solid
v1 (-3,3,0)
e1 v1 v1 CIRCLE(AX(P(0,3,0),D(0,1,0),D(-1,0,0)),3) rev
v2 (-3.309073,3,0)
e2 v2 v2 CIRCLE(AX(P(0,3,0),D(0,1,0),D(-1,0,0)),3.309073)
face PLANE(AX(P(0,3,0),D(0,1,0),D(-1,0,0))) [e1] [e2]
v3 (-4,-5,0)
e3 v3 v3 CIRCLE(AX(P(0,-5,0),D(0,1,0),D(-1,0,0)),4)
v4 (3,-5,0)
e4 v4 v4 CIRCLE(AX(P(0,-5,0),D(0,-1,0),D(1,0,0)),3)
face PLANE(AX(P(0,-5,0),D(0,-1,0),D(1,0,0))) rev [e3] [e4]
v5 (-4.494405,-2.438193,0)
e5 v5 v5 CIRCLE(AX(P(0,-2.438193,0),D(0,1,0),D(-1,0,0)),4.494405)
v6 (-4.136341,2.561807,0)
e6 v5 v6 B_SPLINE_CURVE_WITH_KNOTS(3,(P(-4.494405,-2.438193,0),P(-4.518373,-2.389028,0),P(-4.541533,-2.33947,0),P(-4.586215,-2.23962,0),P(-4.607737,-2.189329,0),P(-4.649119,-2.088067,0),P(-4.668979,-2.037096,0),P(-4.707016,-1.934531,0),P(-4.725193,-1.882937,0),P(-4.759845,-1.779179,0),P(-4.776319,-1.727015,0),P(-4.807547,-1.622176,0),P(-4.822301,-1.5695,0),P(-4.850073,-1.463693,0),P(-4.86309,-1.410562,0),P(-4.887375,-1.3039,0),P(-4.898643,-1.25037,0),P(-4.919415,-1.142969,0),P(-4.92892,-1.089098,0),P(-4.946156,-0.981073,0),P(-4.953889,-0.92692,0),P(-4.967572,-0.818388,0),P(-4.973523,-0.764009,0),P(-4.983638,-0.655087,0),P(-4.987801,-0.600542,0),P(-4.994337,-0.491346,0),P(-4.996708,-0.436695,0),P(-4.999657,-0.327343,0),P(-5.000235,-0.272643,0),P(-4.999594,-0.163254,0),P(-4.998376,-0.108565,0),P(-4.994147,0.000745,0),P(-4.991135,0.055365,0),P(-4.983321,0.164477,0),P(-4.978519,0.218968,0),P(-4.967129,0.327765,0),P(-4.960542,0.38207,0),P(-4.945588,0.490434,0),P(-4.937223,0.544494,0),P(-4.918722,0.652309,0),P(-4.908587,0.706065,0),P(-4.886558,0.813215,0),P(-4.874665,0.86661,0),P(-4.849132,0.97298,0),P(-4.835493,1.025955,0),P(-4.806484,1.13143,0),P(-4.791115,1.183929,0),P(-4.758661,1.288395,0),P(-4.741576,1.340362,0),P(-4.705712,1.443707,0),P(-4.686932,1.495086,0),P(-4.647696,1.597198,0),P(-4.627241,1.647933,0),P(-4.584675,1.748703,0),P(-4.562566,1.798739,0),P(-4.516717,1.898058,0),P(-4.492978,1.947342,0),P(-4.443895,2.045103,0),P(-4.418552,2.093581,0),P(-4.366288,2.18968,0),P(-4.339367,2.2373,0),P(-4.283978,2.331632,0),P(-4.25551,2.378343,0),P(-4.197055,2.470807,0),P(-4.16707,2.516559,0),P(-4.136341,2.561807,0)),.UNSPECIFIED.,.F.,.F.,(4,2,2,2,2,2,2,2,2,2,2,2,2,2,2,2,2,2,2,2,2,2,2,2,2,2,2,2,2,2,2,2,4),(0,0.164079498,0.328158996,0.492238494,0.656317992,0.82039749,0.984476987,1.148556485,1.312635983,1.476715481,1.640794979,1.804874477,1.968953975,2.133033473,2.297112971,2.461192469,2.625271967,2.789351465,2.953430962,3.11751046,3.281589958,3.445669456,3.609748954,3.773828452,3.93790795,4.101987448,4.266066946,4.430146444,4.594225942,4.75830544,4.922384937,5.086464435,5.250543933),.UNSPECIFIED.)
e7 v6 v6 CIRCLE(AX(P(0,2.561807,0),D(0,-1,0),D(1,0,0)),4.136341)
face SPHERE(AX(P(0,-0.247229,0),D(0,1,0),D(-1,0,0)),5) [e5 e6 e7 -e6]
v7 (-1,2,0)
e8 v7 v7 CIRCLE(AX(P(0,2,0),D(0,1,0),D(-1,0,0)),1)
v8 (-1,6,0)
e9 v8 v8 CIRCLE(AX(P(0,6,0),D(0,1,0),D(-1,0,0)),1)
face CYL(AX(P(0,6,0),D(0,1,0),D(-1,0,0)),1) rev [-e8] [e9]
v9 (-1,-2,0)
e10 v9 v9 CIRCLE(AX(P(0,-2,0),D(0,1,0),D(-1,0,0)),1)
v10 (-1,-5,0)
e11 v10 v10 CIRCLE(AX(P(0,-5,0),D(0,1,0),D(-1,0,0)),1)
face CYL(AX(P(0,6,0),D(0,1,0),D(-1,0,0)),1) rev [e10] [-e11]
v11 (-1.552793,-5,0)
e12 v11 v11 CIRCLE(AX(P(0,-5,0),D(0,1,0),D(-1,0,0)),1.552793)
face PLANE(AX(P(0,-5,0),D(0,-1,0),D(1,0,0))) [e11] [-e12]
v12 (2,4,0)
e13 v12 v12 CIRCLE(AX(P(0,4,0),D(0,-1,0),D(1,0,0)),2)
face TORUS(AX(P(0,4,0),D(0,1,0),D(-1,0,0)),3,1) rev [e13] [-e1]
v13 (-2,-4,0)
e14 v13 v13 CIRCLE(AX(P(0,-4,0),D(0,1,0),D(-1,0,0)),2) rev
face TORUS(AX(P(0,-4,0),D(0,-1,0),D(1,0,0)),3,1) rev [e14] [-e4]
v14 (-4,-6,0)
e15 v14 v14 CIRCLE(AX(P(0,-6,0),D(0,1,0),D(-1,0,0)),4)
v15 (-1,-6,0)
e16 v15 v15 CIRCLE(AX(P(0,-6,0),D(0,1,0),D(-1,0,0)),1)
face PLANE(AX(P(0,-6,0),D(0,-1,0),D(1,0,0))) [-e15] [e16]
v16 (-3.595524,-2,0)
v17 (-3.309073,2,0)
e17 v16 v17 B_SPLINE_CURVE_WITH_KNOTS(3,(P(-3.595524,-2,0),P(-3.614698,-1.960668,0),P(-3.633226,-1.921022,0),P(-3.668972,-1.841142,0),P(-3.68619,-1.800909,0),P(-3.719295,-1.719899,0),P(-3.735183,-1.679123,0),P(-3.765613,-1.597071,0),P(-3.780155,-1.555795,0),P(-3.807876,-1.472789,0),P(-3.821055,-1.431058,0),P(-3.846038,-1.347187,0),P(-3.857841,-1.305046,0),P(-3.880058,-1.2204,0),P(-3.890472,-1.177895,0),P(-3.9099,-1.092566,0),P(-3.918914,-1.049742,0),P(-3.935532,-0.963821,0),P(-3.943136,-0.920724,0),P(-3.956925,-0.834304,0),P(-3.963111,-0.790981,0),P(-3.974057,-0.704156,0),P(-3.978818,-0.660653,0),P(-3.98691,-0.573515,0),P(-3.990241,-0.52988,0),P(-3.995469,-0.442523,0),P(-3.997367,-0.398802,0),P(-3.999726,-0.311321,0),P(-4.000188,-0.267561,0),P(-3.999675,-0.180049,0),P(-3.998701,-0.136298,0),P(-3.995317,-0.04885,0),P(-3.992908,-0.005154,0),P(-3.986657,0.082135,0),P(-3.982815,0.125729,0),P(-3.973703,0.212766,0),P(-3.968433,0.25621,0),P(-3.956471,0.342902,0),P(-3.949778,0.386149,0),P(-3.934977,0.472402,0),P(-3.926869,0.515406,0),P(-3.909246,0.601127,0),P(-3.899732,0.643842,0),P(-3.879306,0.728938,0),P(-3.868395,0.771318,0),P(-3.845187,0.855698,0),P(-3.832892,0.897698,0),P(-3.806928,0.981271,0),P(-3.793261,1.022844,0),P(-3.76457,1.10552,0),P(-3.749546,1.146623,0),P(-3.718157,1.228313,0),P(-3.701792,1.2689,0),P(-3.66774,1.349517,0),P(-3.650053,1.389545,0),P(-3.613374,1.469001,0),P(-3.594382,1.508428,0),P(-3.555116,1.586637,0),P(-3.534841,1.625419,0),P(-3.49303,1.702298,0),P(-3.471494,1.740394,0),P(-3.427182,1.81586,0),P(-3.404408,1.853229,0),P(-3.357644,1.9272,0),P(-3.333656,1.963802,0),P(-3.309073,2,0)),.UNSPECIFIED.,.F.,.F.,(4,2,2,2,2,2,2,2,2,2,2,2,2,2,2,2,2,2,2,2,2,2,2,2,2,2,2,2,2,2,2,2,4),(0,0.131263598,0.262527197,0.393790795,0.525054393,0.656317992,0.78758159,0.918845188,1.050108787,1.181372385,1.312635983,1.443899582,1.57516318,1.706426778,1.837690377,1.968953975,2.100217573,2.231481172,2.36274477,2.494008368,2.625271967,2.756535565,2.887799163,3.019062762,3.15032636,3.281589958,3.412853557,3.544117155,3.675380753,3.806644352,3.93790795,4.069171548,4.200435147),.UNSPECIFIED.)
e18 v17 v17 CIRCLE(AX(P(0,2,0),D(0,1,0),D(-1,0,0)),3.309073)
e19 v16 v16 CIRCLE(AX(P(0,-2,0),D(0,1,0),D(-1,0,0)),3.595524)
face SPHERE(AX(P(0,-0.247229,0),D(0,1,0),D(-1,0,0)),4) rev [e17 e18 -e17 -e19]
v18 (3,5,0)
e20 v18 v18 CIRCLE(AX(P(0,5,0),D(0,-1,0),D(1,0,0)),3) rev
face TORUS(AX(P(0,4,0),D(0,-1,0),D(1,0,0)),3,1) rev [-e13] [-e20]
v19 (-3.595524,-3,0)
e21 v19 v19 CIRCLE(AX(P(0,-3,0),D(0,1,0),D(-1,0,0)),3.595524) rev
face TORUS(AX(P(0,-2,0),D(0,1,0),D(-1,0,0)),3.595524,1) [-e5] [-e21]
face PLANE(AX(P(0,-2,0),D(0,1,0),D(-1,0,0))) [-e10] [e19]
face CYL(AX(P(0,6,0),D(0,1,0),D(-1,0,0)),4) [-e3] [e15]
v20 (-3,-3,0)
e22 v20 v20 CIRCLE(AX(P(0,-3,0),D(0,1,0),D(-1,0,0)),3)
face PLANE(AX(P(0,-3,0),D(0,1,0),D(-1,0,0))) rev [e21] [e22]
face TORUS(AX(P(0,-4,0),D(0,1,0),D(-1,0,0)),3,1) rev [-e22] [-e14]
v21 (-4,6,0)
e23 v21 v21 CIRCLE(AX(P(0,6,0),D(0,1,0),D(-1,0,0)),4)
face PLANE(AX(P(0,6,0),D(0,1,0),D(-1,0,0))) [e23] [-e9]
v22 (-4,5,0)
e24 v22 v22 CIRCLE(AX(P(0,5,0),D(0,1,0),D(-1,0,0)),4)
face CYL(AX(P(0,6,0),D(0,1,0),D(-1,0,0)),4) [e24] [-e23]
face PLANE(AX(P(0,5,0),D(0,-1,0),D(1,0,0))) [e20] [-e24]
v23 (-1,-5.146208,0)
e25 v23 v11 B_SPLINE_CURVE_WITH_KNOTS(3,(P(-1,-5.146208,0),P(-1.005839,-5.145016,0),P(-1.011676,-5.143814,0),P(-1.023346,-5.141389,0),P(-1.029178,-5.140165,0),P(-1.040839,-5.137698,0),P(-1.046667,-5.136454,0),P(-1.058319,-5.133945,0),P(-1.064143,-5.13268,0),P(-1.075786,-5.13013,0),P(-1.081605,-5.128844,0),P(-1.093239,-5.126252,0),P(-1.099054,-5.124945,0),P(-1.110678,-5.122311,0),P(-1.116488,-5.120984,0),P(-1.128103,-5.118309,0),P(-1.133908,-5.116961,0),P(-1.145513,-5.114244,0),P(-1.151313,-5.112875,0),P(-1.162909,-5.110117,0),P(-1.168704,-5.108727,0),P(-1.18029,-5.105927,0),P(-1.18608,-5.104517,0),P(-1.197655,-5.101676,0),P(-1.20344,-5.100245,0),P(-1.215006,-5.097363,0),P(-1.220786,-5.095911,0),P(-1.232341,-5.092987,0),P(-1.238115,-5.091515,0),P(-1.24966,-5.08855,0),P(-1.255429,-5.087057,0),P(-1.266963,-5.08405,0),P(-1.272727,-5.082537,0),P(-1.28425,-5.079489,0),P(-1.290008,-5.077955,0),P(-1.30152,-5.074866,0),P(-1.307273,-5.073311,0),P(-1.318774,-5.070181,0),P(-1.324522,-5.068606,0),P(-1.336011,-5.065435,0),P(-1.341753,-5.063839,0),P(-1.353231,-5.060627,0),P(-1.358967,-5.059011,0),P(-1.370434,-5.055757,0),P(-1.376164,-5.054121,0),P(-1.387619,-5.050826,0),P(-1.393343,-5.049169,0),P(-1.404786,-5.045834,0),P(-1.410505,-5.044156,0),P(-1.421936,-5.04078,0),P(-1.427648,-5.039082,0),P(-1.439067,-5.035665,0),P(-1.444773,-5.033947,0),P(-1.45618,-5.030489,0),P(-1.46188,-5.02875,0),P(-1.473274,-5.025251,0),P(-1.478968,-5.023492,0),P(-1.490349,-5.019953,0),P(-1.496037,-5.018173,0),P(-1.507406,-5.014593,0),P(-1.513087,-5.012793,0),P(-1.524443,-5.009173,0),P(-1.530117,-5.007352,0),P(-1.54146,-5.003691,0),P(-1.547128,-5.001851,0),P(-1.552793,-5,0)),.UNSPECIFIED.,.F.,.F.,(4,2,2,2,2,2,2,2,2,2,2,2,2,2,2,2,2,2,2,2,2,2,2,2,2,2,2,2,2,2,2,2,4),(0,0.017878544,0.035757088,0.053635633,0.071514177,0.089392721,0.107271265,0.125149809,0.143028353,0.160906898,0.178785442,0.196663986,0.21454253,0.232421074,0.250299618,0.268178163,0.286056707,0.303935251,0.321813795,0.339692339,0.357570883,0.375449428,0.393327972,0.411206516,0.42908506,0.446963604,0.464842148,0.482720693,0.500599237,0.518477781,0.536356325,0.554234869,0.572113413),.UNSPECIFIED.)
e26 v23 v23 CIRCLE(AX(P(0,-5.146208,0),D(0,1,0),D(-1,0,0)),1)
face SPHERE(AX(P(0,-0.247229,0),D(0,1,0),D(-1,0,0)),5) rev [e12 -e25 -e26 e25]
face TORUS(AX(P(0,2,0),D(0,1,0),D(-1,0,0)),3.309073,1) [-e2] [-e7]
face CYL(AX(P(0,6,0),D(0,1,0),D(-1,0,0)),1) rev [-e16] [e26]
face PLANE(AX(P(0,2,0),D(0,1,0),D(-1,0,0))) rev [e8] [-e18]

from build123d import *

# Parameters (mm, degrees)
FILLET1_R = 1


with BuildPart() as part:
    # Sketch1 → Revolve1 (revolve)
    with BuildSketch(Plane.XY):
        with BuildLine():
            Line((-1, 6), (-4, 6))
            Line((-4, 6), (-4, 5))
            Line((-4, 5), (-2, 5))
            Line((-2, 5), (-2, 3))
            Line((-2, 3), (-3.802039542, 3))
            ThreePointArc((-3.802039542, 3), (-4.990419802, 0.06214179), (-4.173997016, -3))
            Line((-4.173997016, -3), (-2, -3))
            Line((-2, -3), (-2, -5))
            Line((-2, -5), (-4, -5))
            Line((-4, -5), (-4, -6))
            Line((-4, -6), (-1, -6))
            Line((-1, -6), (-1, -5.146208353))
            ThreePointArc((-1, -5.146208353), (-1.27848834, -5.081012847), (-1.552793148, -5))
            Line((-1.552793148, -5), (-1, -5))
            Line((-1, -5), (-1, -2))
            Line((-1, -2), (-3.595524073, -2))
            ThreePointArc((-3.595524073, -2), (-3.989782487, 0.038490757), (-3.309072743, 2))
            Line((-3.309072743, 2), (-1, 2))
            Line((-1, 2), (-1, 6))
        make_face()
    revolve(axis=Axis((0, 6, 0), (0, -1, 0)))

    # Fillet1
    fillet1_edges = [part.edges().sort_by_distance(p)[0] for p in [
        (2, -5, 0),
        (2, -3, 0),
        (4.173997016, -3, 0),
        (3.802039542, 3, 0),
        (2, 3, 0),
        (2, 5, 0),
    ]]
    fillet(fillet1_edges, radius=FILLET1_R - 0.0001)  # a hair under: the kernel refuses the full size


solid = part.part
